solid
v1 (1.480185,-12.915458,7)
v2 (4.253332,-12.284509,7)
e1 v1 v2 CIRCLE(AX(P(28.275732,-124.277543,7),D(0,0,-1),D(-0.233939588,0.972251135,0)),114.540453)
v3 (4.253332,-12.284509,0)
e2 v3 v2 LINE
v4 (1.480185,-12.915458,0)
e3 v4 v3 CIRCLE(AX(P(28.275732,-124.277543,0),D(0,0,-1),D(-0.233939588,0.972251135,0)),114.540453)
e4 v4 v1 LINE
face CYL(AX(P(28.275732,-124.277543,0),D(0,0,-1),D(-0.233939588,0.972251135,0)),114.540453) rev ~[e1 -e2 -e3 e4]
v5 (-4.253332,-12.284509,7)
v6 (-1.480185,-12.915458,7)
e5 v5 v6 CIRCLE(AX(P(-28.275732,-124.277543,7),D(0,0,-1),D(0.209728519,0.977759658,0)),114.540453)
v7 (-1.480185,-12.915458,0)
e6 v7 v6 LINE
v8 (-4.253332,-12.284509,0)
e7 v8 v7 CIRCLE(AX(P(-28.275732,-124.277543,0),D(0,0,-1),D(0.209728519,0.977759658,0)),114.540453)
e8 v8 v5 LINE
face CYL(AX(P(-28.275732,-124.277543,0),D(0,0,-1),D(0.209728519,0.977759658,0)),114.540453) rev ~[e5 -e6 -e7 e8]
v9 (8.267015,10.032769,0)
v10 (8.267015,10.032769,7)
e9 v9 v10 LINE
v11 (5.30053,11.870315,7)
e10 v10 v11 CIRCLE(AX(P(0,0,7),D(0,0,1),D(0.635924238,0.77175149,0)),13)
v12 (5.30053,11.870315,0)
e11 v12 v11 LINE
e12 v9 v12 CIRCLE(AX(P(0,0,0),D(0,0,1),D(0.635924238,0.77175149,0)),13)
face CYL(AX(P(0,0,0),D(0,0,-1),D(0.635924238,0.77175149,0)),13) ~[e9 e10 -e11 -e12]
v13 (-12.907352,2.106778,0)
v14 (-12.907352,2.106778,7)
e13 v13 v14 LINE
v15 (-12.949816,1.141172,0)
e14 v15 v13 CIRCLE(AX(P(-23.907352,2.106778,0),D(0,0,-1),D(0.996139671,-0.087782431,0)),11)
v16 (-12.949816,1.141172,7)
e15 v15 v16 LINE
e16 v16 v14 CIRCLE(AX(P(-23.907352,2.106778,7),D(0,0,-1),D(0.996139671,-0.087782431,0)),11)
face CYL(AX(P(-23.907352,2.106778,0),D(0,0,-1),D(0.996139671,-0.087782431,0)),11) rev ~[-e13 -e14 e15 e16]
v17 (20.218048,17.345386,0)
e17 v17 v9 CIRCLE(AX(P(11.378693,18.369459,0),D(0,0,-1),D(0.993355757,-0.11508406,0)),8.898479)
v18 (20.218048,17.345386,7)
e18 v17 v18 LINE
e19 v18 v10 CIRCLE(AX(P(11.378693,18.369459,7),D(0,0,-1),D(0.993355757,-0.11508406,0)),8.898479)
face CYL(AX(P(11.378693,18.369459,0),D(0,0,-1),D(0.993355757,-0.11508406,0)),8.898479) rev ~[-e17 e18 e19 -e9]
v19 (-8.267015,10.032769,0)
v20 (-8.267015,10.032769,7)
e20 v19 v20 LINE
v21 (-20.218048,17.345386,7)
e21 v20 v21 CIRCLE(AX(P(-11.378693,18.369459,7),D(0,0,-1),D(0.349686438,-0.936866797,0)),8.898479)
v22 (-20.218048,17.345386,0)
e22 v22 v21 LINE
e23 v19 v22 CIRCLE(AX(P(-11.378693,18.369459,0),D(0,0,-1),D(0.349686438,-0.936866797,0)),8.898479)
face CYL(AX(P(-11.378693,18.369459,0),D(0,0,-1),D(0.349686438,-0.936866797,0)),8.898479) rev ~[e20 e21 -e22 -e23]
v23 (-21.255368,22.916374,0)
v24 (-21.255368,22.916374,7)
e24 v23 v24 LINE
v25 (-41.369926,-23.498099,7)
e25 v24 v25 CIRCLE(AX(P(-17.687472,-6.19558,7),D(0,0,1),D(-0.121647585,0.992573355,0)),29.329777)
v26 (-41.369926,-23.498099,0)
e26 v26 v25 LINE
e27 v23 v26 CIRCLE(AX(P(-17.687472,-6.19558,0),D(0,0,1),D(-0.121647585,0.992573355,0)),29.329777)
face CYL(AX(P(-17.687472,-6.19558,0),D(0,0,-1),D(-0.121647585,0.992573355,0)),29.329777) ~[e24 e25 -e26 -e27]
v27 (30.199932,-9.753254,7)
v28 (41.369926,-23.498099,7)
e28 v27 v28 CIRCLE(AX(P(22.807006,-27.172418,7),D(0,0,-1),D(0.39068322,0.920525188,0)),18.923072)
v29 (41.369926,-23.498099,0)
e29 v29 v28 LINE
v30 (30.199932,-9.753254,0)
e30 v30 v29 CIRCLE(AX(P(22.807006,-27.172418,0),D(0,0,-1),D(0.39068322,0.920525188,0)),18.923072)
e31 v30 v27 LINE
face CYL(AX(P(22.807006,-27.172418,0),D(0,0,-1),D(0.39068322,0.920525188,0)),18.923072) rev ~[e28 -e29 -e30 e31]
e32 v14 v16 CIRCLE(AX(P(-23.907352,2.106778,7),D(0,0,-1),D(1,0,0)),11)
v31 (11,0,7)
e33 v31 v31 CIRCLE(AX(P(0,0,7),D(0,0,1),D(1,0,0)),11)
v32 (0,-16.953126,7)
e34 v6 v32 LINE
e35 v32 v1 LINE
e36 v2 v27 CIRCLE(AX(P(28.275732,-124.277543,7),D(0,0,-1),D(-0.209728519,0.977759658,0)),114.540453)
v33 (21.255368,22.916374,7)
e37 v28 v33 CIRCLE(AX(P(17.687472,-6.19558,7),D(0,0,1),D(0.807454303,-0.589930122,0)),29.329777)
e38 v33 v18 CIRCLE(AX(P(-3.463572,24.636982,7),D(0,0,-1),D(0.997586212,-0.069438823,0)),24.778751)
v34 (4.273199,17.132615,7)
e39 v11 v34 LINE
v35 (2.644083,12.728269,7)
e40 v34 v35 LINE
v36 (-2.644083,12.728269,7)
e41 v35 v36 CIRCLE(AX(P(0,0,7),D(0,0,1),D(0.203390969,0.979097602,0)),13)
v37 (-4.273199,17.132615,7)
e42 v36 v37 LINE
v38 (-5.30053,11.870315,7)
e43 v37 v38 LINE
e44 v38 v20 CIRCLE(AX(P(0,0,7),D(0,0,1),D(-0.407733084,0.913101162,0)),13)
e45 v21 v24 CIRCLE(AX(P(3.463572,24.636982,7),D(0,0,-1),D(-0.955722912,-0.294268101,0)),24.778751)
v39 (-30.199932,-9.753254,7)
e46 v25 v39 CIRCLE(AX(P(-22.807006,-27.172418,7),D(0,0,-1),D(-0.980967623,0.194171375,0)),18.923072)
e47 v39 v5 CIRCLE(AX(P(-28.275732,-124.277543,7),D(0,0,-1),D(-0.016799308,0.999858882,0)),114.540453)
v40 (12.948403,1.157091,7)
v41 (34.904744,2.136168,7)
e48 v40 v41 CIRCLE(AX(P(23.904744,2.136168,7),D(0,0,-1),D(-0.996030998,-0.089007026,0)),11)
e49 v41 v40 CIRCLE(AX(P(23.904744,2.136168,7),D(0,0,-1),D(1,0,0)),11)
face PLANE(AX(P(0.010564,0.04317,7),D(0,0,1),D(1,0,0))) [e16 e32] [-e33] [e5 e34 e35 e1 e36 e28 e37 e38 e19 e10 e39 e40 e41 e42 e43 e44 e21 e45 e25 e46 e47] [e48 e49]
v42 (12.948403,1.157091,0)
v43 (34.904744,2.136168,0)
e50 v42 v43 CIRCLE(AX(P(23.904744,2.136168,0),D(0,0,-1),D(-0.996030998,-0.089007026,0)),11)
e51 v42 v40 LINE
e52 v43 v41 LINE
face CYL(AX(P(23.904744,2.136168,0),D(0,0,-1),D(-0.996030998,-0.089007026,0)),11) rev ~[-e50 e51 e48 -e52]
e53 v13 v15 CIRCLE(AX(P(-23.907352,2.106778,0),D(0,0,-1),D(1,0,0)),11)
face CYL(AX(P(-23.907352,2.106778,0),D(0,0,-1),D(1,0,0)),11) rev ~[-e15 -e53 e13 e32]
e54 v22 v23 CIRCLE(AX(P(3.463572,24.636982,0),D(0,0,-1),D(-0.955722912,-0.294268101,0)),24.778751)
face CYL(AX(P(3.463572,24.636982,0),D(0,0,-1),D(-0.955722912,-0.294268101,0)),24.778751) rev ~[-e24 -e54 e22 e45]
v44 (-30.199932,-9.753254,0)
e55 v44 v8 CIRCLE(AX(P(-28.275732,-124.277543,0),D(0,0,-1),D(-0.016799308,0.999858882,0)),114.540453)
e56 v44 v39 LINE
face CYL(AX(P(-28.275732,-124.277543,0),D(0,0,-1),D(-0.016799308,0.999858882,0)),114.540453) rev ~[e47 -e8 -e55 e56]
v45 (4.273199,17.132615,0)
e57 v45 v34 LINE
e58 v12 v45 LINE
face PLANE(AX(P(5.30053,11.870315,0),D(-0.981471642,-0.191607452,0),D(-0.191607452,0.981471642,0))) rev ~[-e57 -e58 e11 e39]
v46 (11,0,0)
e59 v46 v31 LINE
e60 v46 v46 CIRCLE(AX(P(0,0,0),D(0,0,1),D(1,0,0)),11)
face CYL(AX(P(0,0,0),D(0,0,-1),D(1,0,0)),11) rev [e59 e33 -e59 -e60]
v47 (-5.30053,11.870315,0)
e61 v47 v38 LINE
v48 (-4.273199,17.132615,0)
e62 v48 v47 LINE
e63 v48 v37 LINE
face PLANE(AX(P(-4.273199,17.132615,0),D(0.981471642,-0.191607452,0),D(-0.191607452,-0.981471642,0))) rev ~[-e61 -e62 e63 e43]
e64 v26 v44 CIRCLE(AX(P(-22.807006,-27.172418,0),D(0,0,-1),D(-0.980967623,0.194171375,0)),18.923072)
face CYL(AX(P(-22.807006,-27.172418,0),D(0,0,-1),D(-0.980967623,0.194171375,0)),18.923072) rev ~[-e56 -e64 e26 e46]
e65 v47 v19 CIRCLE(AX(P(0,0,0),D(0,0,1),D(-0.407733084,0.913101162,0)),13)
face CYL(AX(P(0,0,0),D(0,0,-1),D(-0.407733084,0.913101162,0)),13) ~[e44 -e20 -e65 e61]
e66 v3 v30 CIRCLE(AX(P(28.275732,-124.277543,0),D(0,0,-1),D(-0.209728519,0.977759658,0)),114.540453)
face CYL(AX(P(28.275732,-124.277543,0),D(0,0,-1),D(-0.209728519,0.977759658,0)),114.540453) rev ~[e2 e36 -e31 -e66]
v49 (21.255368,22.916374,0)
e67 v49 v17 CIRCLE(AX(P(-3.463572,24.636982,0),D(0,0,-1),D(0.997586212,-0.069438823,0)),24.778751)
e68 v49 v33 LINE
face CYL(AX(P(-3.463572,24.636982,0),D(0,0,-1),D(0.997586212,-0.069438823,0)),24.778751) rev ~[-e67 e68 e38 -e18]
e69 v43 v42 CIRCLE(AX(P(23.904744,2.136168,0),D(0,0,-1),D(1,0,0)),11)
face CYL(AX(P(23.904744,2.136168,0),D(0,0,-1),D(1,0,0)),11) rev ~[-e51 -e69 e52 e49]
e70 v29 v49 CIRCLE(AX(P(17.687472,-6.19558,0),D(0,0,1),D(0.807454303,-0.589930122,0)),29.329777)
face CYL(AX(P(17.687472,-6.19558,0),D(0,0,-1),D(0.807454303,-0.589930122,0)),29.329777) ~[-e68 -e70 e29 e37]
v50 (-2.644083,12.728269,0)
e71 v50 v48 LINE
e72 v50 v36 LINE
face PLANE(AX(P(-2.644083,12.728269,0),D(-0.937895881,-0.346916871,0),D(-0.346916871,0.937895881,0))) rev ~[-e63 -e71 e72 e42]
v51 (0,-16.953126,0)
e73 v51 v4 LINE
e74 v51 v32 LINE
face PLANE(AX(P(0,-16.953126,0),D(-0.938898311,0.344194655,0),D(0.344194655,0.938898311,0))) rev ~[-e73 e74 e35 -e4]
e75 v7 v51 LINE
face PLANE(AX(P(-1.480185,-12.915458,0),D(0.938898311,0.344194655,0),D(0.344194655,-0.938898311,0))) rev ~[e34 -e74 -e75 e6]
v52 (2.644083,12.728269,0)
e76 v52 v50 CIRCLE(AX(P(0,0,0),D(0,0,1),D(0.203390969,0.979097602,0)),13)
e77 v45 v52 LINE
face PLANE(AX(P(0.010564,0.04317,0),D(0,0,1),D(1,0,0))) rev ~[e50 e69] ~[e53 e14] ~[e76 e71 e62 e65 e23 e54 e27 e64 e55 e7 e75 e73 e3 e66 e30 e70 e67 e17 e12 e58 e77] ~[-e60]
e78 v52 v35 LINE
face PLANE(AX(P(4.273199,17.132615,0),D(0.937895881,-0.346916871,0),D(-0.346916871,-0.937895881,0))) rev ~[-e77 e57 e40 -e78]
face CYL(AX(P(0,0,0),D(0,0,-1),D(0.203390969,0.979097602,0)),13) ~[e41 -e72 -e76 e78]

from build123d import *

# Parameters (mm, degrees)
F0_R     = 11
F1_DEPTH = 7


# Not quite as in the source:
# - a feature names something its author has since deleted; it is built from what else it names


with BuildPart() as f1:
    # F0 (on Top) → F1 (new body)
    with BuildSketch(Plane.XY):
        with BuildLine():
            ThreePointArc((8.2670150988, 10.0327693762), (6.6928166447, 10.8047053779), (5.3005300857, 11.87031511))
            ThreePointArc((5.3005300857, 11.87031511), (3.9954022113, 12.3708027698), (2.6440826014, 12.7282688217))
            ThreePointArc((2.6440826014, 12.7282688217), (0, 13), (-2.6440826014, 12.7282688217))
            ThreePointArc((-2.6440826014, 12.7282688217), (-3.9954022113, 12.3708027698), (-5.3005300857, 11.87031511))
            ThreePointArc((-5.3005300857, 11.87031511), (-6.6928166447, 10.8047053779), (-8.2670150988, 10.0327693762))
            ThreePointArc((-8.2670150988, 10.0327693762), (-11.5023304401, 6.0577549014), (-12.9498157312, 1.1411715589))
            ThreePointArc((-12.9498157312, 1.1411715589), (-10.91097159, -7.0675808423), (-4.2533323097, -12.2845091177))
            ThreePointArc((-4.2533323097, -12.2845091177), (-2.8648005364, -12.5913760507), (-1.4801854989, -12.9154578273))
            ThreePointArc((-1.4801854989, -12.9154578273), (0, -13), (1.4801854989, -12.9154578273))
            ThreePointArc((1.4801854989, -12.9154578273), (2.8648005364, -12.5913760507), (4.2533323097, -12.2845091177))
            ThreePointArc((4.2533323097, -12.2845091177), (10.5899320117, -7.5401153829), (13, 0))
            ThreePointArc((13, 0), (12.9870943447, 0.5791204378), (12.9484030029, 1.1570910404))
            ThreePointArc((12.9484030029, 1.1570910404), (11.4986046018, 6.0648241699), (8.2670150988, 10.0327693762))
        make_face()
        Circle(F0_R, mode=Mode.SUBTRACT)
        with BuildLine():
            ThreePointArc((2.6440826014, 12.7282688217), (3.9954022113, 12.3708027698), (5.3005300857, 11.87031511))
            Line((5.3005300857, 11.87031511), (4.2731994612, 17.1326149936))
            Line((4.2731994612, 17.1326149936), (2.6440826014, 12.7282688217))
        make_face()
        with BuildLine():
            ThreePointArc((8.2670150988, 10.0327693762), (6.8457077183, 11.0515286651), (5.3005300857, 11.87031511))
            ThreePointArc((5.3005300857, 11.87031511), (6.6928166447, 10.8047053779), (8.2670150988, 10.0327693762))
        make_face()
        with BuildLine():
            ThreePointArc((20.2180479346, 17.345385846), (16.0230615621, 10.7791515778), (8.2670150988, 10.0327693762))
            ThreePointArc((8.2670150988, 10.0327693762), (11.4986046018, 6.0648241699), (12.9484030029, 1.1570910404))
            ThreePointArc((12.9484030029, 1.1570910404), (12.9870943447, 0.5791204378), (13, 0))
            ThreePointArc((13, 0), (10.5899320117, -7.5401153829), (4.2533323097, -12.2845091177))
            ThreePointArc((4.2533323097, -12.2845091177), (17.1543822867, -10.2782846696), (30.1999320971, -9.7532540138))
            ThreePointArc((30.1999320971, -9.7532540138), (37.492259841, -15.2381838585), (41.3699261844, -23.4980992973))
            ThreePointArc((41.3699261844, -23.4980992973), (44.5988308489, 5.4669473875), (21.2553682043, 22.9163744996))
            ThreePointArc((21.2553682043, 22.9163744996), (20.8964882238, 20.1011290455), (20.2180479346, 17.345385846))
        make_face()
        with BuildLine():
            ThreePointArc((34.9047439829, 2.1361683247), (24.3947690942, -8.8529114999), (12.9484030029, 1.1570910404))
            ThreePointArc((12.9484030029, 1.1570910404), (23.4147188717, 13.1252481492), (34.9047439829, 2.1361683247))
        make_face(mode=Mode.SUBTRACT)
        with BuildLine():
            ThreePointArc((-5.3005300857, 11.87031511), (-3.9954022113, 12.3708027698), (-2.6440826014, 12.7282688217))
            Line((-2.6440826014, 12.7282688217), (-4.2731994612, 17.1326149936))
            Line((-4.2731994612, 17.1326149936), (-5.3005300857, 11.87031511))
        make_face()
        with BuildLine():
            ThreePointArc((-8.2670150988, 10.0327693762), (-6.6928166447, 10.8047053779), (-5.3005300857, 11.87031511))
            ThreePointArc((-5.3005300857, 11.87031511), (-6.8457077183, 11.0515286651), (-8.2670150988, 10.0327693762))
        make_face()
        with BuildLine():
            ThreePointArc((-12.9498157312, 1.1411715589), (-11.5023304401, 6.0577549014), (-8.2670150988, 10.0327693762))
            ThreePointArc((-8.2670150988, 10.0327693762), (-16.0230615621, 10.7791515778), (-20.2180479346, 17.345385846))
            ThreePointArc((-20.2180479346, 17.345385846), (-20.8964882238, 20.1011290455), (-21.2553682043, 22.9163744996))
            ThreePointArc((-21.2553682043, 22.9163744996), (-44.5988308489, 5.4669473875), (-41.3699261844, -23.4980992973))
            ThreePointArc((-41.3699261844, -23.4980992973), (-37.492259841, -15.2381838585), (-30.1999320971, -9.7532540138))
            ThreePointArc((-30.1999320971, -9.7532540138), (-17.1543822867, -10.2782846696), (-4.2533323097, -12.2845091177))
            ThreePointArc((-4.2533323097, -12.2845091177), (-10.91097159, -7.0675808423), (-12.9498157312, 1.1411715589))
        make_face()
        with BuildLine():
            ThreePointArc((-12.9073521155, 2.1067783052), (-12.917973147, 1.6235083115), (-12.9498157312, 1.1411715589))
            ThreePointArc((-12.9498157312, 1.1411715589), (-34.896731084, 2.5900482989), (-12.9073521155, 2.1067783052))
        make_face(mode=Mode.SUBTRACT)
        with BuildLine():
            Line((0, -16.953125596), (1.4801854989, -12.9154578273))
            ThreePointArc((1.4801854989, -12.9154578273), (0, -13), (-1.4801854989, -12.9154578273))
            Line((-1.4801854989, -12.9154578273), (0, -16.953125596))
        make_face()
    extrude(amount=F1_DEPTH)


solid = f1.part
